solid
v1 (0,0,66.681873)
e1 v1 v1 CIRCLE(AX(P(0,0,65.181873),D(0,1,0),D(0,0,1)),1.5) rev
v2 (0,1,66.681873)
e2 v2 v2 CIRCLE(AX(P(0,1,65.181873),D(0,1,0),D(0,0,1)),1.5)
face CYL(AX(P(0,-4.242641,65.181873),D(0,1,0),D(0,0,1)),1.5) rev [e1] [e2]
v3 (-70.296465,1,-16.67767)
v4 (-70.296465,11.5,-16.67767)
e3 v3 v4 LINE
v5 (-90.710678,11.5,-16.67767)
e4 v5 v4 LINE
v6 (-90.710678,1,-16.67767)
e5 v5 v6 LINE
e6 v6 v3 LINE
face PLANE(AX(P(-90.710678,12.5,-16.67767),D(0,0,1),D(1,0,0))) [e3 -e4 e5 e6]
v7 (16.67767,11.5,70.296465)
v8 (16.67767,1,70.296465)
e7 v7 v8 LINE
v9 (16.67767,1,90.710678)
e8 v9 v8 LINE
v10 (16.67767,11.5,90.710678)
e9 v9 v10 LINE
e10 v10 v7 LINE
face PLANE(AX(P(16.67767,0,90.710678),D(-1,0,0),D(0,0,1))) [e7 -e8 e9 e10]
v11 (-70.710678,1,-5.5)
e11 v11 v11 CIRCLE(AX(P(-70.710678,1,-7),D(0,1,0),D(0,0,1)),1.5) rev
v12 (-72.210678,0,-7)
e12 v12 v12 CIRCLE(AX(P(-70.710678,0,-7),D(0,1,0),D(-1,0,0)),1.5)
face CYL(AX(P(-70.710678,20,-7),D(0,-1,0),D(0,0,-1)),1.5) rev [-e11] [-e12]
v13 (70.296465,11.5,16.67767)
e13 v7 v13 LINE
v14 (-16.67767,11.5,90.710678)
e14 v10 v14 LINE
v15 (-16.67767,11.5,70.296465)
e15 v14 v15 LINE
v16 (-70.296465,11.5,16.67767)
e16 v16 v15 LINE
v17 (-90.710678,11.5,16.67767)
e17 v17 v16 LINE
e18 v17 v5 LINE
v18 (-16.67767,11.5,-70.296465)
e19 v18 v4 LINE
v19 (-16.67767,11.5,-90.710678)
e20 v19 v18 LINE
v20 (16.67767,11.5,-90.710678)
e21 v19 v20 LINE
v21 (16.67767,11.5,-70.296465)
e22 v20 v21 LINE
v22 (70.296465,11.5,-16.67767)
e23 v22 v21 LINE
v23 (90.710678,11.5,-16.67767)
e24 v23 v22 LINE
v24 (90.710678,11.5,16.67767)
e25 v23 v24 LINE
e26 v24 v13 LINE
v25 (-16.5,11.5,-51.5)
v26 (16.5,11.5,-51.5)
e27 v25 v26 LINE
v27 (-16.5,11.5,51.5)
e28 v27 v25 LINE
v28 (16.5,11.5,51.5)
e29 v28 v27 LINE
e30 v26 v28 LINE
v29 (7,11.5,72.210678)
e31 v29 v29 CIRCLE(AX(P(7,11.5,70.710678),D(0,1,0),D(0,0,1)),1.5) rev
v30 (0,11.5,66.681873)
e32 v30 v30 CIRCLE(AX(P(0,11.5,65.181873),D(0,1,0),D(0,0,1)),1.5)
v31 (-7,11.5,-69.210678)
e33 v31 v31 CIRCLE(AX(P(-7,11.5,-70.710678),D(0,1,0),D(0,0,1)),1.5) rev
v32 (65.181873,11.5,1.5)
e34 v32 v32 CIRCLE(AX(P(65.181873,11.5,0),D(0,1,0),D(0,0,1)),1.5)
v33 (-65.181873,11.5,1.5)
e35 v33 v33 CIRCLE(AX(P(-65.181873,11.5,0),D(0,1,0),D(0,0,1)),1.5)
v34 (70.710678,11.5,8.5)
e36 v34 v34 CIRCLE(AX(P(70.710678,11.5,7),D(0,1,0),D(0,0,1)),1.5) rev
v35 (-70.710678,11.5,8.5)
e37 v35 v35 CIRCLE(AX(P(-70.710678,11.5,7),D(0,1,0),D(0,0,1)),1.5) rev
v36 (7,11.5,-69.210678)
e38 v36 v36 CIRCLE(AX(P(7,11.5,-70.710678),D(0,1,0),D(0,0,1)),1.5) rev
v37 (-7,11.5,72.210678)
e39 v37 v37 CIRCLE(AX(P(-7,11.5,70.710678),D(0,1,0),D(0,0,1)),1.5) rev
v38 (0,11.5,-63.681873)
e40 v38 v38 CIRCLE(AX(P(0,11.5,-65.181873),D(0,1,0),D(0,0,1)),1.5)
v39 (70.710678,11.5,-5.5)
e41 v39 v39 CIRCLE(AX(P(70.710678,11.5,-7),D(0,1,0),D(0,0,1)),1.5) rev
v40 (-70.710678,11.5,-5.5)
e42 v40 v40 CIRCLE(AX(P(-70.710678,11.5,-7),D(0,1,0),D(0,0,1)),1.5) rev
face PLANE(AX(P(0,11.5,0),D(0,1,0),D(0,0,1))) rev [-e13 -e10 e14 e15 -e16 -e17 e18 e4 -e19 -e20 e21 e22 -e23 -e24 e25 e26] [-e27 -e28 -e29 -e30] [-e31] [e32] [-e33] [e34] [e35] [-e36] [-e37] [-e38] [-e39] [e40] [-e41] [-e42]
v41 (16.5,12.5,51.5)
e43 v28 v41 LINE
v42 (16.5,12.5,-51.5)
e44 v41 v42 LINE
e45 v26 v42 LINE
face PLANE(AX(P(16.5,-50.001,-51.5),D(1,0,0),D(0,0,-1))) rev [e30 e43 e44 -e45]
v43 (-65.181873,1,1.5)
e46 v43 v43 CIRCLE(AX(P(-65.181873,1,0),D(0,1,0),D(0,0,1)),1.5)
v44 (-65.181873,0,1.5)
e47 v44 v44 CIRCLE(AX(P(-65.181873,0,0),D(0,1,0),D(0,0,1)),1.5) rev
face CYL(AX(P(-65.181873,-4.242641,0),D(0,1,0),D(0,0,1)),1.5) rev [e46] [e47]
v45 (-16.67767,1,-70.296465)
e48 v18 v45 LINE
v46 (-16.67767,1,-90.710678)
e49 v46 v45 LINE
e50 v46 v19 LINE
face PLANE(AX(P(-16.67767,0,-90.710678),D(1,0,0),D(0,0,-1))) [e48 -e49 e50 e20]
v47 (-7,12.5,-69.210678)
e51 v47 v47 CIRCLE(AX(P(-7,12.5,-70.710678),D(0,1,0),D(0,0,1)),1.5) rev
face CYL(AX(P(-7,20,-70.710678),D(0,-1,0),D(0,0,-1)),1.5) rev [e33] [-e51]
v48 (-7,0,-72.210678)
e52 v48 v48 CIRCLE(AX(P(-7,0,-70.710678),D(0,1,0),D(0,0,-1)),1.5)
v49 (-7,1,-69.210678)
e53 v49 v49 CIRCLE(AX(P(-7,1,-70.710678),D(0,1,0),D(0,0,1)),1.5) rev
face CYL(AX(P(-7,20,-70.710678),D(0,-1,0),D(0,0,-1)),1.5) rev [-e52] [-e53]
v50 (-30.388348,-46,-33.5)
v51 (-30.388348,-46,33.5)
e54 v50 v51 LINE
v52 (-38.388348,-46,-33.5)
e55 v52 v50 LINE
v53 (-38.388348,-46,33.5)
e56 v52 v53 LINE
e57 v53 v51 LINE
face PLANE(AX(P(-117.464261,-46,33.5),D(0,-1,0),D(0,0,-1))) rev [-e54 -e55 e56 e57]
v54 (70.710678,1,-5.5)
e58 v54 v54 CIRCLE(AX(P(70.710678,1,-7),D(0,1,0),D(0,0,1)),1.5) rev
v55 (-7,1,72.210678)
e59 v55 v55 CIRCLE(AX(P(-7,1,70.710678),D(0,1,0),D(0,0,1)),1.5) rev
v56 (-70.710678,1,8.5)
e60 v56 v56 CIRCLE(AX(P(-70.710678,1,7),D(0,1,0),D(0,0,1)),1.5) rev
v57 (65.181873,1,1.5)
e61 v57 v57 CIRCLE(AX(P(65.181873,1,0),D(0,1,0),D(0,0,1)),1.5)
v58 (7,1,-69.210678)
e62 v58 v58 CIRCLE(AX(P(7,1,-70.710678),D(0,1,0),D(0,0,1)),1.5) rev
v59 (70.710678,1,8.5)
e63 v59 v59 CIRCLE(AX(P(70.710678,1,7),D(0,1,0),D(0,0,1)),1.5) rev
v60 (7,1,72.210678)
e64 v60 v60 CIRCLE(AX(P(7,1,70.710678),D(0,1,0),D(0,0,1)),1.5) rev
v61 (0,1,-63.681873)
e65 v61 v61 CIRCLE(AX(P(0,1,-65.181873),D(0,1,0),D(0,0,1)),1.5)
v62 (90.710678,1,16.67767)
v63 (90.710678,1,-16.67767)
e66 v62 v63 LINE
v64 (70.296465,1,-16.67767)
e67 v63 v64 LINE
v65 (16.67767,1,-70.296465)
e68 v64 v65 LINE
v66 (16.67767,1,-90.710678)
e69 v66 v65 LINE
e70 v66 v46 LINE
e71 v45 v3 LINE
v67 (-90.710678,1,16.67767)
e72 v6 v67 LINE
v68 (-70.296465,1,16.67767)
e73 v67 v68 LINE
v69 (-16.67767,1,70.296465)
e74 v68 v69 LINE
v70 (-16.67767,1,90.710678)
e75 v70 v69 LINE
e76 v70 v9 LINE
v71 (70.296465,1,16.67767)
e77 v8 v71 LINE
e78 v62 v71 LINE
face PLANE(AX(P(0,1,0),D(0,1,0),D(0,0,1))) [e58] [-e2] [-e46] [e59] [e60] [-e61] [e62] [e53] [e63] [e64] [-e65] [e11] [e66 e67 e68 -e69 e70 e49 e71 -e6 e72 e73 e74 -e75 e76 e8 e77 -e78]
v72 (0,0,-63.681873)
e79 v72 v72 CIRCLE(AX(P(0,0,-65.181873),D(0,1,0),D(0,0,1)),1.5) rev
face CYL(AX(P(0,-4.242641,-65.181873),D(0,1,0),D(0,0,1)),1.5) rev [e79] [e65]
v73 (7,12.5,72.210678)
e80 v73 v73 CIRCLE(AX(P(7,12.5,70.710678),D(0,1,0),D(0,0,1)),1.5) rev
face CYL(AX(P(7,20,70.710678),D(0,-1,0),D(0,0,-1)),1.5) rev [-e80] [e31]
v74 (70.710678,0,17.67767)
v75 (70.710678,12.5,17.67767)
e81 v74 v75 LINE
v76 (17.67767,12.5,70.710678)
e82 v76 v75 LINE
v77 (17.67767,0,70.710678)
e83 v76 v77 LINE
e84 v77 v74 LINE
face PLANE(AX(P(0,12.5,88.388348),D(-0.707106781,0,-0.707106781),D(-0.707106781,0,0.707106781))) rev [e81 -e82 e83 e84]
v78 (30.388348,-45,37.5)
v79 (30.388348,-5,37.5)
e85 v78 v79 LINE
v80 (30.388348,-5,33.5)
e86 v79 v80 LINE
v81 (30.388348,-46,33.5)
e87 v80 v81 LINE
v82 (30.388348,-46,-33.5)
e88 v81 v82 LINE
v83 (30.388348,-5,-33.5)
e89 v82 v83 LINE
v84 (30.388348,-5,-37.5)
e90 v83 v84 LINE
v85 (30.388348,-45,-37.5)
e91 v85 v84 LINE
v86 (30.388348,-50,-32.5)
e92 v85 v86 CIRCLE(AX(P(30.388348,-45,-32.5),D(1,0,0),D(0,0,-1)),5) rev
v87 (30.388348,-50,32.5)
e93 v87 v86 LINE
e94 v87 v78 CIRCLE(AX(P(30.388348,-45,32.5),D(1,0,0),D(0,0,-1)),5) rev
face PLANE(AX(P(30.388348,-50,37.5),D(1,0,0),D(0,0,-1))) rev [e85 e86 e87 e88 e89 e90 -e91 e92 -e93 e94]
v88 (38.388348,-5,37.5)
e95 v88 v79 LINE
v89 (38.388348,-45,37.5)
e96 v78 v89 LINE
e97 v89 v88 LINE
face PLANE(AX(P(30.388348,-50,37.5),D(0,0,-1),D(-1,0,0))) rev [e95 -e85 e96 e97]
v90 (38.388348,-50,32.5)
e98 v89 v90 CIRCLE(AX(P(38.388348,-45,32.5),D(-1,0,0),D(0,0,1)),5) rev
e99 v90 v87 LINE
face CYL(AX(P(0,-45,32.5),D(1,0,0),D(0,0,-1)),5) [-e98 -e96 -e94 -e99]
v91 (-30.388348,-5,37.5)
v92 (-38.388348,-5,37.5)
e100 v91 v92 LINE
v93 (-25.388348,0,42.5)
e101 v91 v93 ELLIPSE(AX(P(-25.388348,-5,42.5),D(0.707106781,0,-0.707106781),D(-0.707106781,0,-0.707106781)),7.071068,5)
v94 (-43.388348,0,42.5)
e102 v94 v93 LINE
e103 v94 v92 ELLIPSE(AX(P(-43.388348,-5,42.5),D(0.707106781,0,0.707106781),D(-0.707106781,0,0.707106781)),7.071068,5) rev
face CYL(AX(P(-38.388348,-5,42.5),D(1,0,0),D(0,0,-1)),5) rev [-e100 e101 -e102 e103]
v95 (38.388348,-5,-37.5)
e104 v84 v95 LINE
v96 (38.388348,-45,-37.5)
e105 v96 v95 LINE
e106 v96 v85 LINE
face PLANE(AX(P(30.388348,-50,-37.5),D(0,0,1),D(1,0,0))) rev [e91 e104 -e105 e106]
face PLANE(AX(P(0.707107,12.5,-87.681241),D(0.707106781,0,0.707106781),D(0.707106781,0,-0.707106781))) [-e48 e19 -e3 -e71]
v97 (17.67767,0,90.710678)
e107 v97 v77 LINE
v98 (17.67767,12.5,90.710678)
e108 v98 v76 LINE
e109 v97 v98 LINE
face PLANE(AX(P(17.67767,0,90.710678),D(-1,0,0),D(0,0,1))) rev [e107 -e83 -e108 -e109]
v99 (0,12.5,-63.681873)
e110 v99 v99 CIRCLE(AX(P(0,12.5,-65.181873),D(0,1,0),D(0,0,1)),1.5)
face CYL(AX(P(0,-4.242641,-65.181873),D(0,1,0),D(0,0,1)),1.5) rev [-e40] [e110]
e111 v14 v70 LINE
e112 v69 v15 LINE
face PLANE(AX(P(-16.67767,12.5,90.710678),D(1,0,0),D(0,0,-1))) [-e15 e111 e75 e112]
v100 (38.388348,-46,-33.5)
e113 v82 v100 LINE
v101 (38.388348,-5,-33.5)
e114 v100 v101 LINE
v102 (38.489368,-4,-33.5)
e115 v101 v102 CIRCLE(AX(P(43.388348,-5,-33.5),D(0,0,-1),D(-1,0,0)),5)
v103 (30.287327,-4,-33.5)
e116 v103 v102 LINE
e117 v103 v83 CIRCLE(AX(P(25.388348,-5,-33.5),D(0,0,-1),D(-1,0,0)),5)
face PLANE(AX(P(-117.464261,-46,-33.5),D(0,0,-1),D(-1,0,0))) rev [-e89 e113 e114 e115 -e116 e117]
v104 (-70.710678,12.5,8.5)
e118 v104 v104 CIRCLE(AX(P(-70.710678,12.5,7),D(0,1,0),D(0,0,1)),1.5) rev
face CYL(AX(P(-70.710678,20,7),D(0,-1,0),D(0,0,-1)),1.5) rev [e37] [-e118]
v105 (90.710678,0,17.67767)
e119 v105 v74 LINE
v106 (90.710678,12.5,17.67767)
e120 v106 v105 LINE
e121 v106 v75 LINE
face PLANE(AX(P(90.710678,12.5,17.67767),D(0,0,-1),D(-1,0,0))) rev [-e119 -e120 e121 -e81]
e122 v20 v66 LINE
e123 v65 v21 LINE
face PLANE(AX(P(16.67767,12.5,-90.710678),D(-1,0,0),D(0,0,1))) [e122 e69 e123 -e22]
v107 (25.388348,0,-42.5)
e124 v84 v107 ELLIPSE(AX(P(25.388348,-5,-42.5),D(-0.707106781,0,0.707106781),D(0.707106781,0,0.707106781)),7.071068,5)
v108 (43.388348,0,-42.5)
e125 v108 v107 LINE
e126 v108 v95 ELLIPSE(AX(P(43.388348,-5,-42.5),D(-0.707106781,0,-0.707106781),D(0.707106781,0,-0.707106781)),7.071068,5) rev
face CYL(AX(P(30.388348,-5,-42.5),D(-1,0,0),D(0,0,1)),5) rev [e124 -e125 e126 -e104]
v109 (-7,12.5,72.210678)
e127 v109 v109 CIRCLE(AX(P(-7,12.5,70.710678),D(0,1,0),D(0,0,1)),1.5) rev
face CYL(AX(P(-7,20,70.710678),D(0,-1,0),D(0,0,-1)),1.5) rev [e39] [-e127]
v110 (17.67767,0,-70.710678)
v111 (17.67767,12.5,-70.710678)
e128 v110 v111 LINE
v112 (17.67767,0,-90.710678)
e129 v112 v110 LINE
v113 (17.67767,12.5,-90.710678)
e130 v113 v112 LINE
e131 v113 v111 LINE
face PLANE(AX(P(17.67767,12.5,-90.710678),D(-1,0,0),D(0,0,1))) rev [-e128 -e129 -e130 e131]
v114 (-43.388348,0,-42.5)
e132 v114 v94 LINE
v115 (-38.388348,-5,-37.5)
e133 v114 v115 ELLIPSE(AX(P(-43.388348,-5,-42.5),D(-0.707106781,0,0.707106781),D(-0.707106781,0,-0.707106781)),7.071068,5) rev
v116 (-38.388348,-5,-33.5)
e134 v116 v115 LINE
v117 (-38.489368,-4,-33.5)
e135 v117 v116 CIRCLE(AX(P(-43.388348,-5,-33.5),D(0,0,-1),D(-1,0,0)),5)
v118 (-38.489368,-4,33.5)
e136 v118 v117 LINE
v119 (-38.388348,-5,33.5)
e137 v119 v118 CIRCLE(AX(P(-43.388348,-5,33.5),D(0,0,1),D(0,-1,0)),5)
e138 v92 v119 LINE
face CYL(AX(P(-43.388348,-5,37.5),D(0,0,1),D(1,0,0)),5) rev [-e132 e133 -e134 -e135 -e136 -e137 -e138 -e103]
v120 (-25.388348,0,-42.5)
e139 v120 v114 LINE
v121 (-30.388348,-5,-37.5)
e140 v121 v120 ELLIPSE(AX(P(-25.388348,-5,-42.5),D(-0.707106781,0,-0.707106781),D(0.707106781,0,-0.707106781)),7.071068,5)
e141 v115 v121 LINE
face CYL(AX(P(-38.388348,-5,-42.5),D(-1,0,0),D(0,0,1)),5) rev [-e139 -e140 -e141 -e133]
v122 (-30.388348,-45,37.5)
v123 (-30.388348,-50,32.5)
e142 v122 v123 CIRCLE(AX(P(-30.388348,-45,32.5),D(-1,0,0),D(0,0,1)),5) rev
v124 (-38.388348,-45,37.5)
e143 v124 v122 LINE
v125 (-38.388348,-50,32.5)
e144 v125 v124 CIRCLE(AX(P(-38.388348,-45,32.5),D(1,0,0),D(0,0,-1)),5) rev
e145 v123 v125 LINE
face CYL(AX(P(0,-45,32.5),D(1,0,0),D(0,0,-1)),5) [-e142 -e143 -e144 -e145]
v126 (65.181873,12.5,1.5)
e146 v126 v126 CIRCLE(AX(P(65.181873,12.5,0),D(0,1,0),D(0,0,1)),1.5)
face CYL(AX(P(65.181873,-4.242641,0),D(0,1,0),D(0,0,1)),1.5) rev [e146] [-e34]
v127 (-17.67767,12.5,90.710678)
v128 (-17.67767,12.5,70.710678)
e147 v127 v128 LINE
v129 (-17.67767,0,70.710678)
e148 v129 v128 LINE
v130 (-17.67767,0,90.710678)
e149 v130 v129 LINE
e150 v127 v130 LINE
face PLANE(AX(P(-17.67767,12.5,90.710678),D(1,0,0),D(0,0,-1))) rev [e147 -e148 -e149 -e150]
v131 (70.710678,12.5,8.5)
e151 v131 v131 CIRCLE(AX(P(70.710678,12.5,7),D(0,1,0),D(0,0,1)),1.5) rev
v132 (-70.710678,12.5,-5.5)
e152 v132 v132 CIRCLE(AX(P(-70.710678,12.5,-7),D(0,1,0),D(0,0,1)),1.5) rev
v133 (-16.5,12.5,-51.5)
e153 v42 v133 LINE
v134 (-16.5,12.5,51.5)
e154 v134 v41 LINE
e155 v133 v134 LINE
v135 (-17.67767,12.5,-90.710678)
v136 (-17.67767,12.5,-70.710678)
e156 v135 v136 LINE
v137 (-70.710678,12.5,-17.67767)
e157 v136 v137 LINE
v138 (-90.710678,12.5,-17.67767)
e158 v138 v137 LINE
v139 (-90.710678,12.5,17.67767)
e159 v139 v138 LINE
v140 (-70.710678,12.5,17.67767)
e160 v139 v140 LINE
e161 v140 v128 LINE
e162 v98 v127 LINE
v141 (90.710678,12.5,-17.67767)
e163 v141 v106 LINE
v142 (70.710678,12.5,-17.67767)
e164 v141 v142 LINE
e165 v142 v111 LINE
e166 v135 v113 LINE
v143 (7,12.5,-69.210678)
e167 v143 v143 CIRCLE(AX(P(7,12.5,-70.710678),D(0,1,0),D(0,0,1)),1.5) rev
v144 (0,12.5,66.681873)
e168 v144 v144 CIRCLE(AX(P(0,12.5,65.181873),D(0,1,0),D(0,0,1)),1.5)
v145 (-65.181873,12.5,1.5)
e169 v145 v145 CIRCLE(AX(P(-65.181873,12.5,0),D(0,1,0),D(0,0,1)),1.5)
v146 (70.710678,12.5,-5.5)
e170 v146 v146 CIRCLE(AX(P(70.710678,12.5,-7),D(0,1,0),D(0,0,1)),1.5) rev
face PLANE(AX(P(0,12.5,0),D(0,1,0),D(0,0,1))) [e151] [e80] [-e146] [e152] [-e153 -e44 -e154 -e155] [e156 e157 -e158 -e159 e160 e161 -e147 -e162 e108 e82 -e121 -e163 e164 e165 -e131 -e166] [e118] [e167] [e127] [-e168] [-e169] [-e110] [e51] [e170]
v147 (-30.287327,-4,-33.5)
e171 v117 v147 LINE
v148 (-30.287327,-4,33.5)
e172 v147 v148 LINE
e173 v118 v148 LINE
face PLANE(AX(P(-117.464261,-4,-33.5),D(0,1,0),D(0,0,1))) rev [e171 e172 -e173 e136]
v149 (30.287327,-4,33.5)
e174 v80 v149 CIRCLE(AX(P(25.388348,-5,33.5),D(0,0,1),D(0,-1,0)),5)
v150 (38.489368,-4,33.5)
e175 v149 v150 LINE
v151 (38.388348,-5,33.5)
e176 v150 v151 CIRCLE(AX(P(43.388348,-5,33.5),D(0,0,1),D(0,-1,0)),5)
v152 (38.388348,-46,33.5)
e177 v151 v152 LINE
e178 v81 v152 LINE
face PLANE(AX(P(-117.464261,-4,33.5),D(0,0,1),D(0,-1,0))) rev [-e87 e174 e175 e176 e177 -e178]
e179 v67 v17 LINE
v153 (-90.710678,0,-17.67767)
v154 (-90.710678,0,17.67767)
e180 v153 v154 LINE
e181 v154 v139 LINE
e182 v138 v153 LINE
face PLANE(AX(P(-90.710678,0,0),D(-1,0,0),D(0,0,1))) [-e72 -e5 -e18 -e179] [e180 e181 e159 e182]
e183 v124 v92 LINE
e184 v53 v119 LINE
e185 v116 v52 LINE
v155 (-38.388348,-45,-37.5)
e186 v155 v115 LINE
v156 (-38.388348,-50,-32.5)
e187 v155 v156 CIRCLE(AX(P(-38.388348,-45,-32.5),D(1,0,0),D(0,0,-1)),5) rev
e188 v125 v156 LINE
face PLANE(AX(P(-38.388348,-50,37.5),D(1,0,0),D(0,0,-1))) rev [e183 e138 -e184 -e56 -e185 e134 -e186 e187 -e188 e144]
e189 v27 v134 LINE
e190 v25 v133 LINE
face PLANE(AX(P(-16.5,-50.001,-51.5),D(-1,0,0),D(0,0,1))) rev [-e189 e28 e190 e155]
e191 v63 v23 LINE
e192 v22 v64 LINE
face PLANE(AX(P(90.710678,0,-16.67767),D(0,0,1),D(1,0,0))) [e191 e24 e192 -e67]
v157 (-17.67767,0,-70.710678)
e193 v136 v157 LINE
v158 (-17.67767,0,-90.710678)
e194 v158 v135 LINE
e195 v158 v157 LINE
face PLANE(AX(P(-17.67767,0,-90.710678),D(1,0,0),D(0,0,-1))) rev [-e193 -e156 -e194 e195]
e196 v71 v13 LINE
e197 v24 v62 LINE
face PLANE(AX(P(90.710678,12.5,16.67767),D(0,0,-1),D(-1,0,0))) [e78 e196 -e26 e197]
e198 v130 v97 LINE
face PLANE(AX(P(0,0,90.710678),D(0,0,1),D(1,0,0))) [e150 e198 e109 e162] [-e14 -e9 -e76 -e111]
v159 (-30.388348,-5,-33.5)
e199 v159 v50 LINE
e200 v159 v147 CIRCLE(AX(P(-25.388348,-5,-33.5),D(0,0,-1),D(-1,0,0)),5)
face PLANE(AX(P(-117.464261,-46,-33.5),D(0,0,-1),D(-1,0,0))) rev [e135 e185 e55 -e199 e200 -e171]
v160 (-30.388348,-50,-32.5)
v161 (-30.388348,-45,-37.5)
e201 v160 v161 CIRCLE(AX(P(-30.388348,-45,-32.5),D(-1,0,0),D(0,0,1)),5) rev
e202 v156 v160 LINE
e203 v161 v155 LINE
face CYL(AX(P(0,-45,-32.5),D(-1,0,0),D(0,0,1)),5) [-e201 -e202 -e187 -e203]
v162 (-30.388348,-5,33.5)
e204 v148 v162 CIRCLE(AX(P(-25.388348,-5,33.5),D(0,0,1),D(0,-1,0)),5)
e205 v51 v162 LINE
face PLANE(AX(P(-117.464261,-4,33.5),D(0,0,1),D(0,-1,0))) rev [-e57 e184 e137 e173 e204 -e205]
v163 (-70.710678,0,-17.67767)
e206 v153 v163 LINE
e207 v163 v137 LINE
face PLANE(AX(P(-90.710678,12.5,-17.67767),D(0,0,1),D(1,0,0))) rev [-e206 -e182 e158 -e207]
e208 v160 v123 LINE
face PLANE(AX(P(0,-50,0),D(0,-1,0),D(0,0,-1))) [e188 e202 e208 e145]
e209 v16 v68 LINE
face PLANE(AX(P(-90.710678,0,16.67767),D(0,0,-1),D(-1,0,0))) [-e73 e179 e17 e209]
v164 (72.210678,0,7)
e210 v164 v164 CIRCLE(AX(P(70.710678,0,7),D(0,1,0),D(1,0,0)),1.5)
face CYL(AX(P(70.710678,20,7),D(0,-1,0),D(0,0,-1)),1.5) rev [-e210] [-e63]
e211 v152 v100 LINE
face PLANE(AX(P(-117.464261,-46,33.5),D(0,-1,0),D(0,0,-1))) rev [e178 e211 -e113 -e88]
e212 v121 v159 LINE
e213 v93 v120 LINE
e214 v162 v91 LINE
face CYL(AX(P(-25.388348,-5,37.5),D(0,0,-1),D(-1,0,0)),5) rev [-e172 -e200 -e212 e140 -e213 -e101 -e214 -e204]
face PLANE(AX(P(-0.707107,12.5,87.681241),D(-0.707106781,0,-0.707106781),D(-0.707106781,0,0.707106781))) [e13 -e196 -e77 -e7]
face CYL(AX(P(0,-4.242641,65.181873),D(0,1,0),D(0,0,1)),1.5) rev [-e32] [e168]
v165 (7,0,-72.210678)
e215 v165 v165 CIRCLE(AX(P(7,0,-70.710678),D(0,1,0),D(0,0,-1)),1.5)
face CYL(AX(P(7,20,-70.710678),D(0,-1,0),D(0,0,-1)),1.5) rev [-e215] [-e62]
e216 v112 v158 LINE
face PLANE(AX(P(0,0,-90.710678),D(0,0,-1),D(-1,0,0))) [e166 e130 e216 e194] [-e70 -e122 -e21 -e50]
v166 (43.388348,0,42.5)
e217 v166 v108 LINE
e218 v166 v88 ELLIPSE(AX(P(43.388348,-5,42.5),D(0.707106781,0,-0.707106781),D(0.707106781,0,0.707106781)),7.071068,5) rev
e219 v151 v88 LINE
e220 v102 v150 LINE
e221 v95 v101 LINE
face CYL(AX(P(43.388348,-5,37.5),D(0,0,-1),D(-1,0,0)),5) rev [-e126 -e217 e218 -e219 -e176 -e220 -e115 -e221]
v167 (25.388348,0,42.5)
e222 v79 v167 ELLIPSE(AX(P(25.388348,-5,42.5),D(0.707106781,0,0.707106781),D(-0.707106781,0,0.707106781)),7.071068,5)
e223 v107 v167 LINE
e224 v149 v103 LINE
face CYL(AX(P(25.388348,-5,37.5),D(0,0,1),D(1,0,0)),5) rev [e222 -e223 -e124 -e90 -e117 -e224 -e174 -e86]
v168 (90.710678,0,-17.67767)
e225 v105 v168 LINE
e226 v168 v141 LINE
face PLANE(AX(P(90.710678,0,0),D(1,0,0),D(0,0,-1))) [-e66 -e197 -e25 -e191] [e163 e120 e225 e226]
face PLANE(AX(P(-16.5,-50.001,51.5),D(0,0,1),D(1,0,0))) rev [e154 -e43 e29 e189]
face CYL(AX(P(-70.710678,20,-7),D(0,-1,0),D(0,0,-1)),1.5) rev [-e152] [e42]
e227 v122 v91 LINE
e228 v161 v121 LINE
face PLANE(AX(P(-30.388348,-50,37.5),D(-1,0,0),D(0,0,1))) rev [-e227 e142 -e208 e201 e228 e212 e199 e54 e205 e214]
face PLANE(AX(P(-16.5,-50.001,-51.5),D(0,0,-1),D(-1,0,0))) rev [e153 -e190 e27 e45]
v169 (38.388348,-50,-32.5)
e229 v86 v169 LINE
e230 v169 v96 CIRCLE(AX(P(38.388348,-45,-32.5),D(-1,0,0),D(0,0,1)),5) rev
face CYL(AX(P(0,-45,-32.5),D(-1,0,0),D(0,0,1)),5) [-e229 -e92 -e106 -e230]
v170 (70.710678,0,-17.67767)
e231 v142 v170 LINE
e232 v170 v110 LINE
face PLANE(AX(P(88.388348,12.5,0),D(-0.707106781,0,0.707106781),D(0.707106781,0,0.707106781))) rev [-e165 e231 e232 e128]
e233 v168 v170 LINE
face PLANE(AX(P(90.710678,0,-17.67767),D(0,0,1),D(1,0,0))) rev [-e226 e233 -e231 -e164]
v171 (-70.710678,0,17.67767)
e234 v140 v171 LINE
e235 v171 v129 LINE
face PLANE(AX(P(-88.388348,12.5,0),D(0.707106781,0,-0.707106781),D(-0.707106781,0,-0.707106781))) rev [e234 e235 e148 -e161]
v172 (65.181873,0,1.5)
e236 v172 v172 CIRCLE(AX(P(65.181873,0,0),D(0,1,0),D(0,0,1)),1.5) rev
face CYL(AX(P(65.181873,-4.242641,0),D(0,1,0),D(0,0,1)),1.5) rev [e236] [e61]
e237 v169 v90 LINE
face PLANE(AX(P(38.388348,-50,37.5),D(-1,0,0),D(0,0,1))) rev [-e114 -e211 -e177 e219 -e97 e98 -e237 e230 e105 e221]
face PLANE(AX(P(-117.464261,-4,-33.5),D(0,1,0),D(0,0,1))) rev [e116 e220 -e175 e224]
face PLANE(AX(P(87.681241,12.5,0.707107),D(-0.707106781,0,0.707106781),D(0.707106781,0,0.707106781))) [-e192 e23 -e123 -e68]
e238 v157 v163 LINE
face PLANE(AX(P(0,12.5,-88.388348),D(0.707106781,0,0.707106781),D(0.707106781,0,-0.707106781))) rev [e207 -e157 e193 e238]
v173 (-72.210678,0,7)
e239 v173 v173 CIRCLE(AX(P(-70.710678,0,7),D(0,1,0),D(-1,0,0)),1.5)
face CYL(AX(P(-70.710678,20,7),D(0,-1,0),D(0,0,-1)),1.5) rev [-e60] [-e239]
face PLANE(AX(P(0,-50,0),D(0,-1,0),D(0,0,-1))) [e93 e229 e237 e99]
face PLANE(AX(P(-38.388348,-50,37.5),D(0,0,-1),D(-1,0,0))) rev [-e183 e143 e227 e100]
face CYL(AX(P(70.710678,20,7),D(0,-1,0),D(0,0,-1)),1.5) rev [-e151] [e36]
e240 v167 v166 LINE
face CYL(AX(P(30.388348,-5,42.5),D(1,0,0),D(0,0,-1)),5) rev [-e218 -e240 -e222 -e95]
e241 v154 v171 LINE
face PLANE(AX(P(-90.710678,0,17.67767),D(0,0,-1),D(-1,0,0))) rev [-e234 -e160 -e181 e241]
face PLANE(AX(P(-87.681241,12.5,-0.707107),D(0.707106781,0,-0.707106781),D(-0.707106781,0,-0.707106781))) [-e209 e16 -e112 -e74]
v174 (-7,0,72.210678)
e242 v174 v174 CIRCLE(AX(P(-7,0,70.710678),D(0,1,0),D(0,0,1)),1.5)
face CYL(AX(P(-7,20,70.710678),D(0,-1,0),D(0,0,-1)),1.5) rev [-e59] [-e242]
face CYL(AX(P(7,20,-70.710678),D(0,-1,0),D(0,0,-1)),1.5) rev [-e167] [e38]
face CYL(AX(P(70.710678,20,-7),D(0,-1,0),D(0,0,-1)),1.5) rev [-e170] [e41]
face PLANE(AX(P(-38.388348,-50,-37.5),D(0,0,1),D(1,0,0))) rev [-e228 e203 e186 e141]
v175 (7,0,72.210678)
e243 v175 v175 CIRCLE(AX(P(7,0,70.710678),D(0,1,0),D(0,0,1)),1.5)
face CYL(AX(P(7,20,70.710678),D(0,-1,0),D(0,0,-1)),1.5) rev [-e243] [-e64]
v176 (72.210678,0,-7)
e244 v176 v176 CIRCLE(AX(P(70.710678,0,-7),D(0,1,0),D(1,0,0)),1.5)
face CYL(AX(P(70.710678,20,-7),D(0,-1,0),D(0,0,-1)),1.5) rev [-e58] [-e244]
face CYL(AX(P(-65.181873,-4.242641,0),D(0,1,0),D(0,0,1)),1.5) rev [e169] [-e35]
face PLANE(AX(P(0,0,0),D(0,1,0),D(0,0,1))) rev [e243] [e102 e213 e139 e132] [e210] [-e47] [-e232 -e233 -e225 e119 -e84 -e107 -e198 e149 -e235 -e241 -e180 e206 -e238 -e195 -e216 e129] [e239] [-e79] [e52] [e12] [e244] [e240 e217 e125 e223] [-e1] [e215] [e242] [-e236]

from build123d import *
from build123d.topology import SkipClean

# Parameters (mm, degrees)
BOSS_EXTRUDE1_DEPTH = 12.5
CHAMFER1_SIZE       = 25
SKETCH3_W           = 35.35533906
SKETCH3_H           = 12.5
BOSS_EXTRUDE2_DEPTH = 20
SKETCH4_W           = 35.35533906
SKETCH4_H           = 12.5
BOSS_EXTRUDE3_DEPTH = 20
SKETCH5_W           = 35.35533906
SKETCH5_H           = 12.5
BOSS_EXTRUDE4_DEPTH = 20
SKETCH6_W           = 35.35533906
SKETCH6_H           = 12.5
BOSS_EXTRUDE5_DEPTH = 20
SHELL1_T            = -1
SKETCH7_R           = 1.5
CUT_EXTRUDE1_DEPTH  = 20
CIRPATTERN1_COUNT   = 4
SKETCH8_W           = 8
SKETCH8_H           = 75
BOSS_EXTRUDE6_DEPTH = 50
CUT_EXTRUDE2_REACH  = 167.514
SKETCH9_W           = 67
SKETCH9_H           = 42
FILLET2_START       = -38.388347648
FILLET2_DEPTH       = 8
FILLET2_START_2     = 30.388347648
FILLET2_2_DEPTH     = 8
FILLET2_START_3     = -42.5
FILLET2_3_DEPTH     = 85
FILLET2_START_4     = -44
FILLET2_4_OUTLINE_W = 1
FILLET2_4_OUTLINE_H = 67
FILLET2_4_DEPTH     = 88
FILLET3_R           = 5
CUT_EXTRUDE3_REACH  = 144.699
SKETCH10_W          = 33
SKETCH10_H          = 103
CUT_EXTRUDE4_START  = -12.5
SKETCH11_R          = 1.5
CUT_EXTRUDE4_DEPTH  = 12.5


with BuildPart() as part:
    # Sketch1 → Boss-Extrude1 (new body)
    with BuildSketch(Plane(origin=(0, 0, 0), x_dir=(1, 0, 0), z_dir=(0, 1, 0))):
        Polygon((88.388347648, 0), (0, 88.388347648), (-88.388347648, 0), (0, -88.388347648), align=None)
    extrude(amount=BOSS_EXTRUDE1_DEPTH)

    # Chamfer1
    chamfer1_edges = [part.edges().sort_by_distance(p)[0] for p in [
        (0, 6.25, 88.388347648),
        (-88.388347648, 6.25, 0),
        (0, 6.25, -88.388347648),
        (88.388347648, 6.25, 0),
    ]]
    chamfer(chamfer1_edges, length=CHAMFER1_SIZE)

    # Sketch3 → Boss-Extrude2 (add)
    with BuildSketch(Plane.XY.offset(70.710678119)):
        with Locations((0, 6.25)):
            Rectangle(SKETCH3_W, SKETCH3_H)
    extrude(amount=BOSS_EXTRUDE2_DEPTH)

    # Sketch4 → Boss-Extrude3 (add)
    with BuildSketch(Plane(origin=(70.710678119, 0, 0), x_dir=(0, 0, -1), z_dir=(1, 0, 0))):
        with Locations((0, 6.25)):
            Rectangle(SKETCH4_W, SKETCH4_H)
    extrude(amount=BOSS_EXTRUDE3_DEPTH)

    # Sketch5 → Boss-Extrude4 (add)
    with BuildSketch(Plane(origin=(0, 0, -70.710678119), x_dir=(-1, 0, 0), z_dir=(0, 0, -1))):
        with Locations((0, 6.25)):
            Rectangle(SKETCH5_W, SKETCH5_H)
    extrude(amount=BOSS_EXTRUDE4_DEPTH)

    # Sketch6 → Boss-Extrude5 (add)
    with BuildSketch(Plane.ZY.offset(70.710678119)):
        with Locations((0, 6.25)):
            Rectangle(SKETCH6_W, SKETCH6_H)
    extrude(amount=BOSS_EXTRUDE5_DEPTH)

    # Shell1
    shell1_openings = [part.faces().sort_by_distance(p)[0] for p in [
        (0, 6.25, 90.710678119),
        (90.710678119, 6.25, 0),
        (0, 6.25, -90.710678119),
        (-90.710678119, 6.25, 0),
    ]]
    offset(amount=SHELL1_T, openings=shell1_openings, kind=Kind.INTERSECTION)

    # Sketch7 → Cut-Extrude1 (cut)
    with BuildSketch(Plane(origin=(-70.710678119, 0, -17.67766953), x_dir=(1, 0, 0), z_dir=(0, 1, 0))):
        with Locations(Location((63.710678119, -88.388347648, 0), (0, 0, 270))):
            Circle(SKETCH7_R)
        with Locations(Location((77.710678119, -88.388347648, 0), (0, 0, 270))):
            Circle(SKETCH7_R)
    cut_extrude1 = extrude(amount=CUT_EXTRUDE1_DEPTH, mode=Mode.SUBTRACT)

    # CirPattern1: Cut-Extrude1 ×4 about axis
    cirpattern1_axis = Axis((0, 0, 0), (0, 1, 0))
    for i in range(1, CIRPATTERN1_COUNT):
        add(cut_extrude1.rotate(cirpattern1_axis, i * 360 / CIRPATTERN1_COUNT), mode=Mode.SUBTRACT)

    # Sketch8 → Boss-Extrude6 (add)
    with BuildSketch(Plane.XZ):
        with Locations((-34.388347648, 0)):
            Rectangle(SKETCH8_W, SKETCH8_H)
        with Locations((34.388347648, 0)):
            Rectangle(SKETCH8_W, SKETCH8_H)
    extrude(amount=BOSS_EXTRUDE6_DEPTH)

    # Cut-Extrude2: up to this face of the body (flat: up to its plane)
    cut_extrude2_end = Plane(part.part.faces().sort_by_distance((-38.388347648, -25, 0))[0])
    # Sketch9 → Cut-Extrude2 (cut, up to the picked face)
    with BuildSketch(Plane(origin=(38.388347648, 0, 0), x_dir=(0, 0, -1), z_dir=(1, 0, 0)), mode=Mode.PRIVATE) as cut_extrude2_sk1:
        with Locations((0, -25)):
            Rectangle(SKETCH9_W, SKETCH9_H)
    cut_extrude2_tool1 = split(extrude(cut_extrude2_sk1.sketch, amount=-CUT_EXTRUDE2_REACH, mode=Mode.PRIVATE), bisect_by=cut_extrude2_end, keep=Keep.BOTH, mode=Mode.PRIVATE)
    add(cut_extrude2_tool1.solids().sort_by(Axis((38.388348, -25, 0), (-1, 0, 0)))[0], mode=Mode.SUBTRACT)

    # Fillet2: read off the stored shape, not the designer's step
    # Fillet2 outline → Fillet2 (add)
    with BuildSketch(Plane.YZ.offset(FILLET2_START)):
        with BuildLine():
            Line((0, -42.5), (0, -37.5))
            Line((0, -37.5), (-5, -37.5))
            ThreePointArc((-5, -37.5), (-1.464466094, -38.964466094), (0, -42.5))
        make_face()
        with BuildLine():
            ThreePointArc((0, 42.5), (-1.464466094, 38.964466094), (-5, 37.5))
            Line((-5, 37.5), (0, 37.5))
            Line((0, 37.5), (0, 42.5))
        make_face()
    extrude(amount=FILLET2_DEPTH)

    # Fillet2 2 outline → Fillet2 2 (add)
    with BuildSketch(Plane.YZ.offset(FILLET2_START_2)):
        with BuildLine():
            Line((0, -42.5), (0, -37.5))
            Line((0, -37.5), (-5, -37.5))
            ThreePointArc((-5, -37.5), (-1.464466094, -38.964466094), (0, -42.5))
        make_face()
        with BuildLine():
            ThreePointArc((0, 42.5), (-1.464466094, 38.964466094), (-5, 37.5))
            Line((-5, 37.5), (0, 37.5))
            Line((0, 37.5), (0, 42.5))
        make_face()
    extrude(amount=FILLET2_2_DEPTH)

    # Fillet2 3 outline → Fillet2 3 (add)
    with BuildSketch(Plane.XY.offset(FILLET2_START_3)):
        with BuildLine():
            Line((-38.388347648, -5), (-38.388347648, 0))
            Line((-38.388347648, 0), (-43.388347648, 0))
            ThreePointArc((-43.388347648, 0), (-39.852813742, -1.464466094), (-38.388347648, -5))
        make_face()
        with BuildLine():
            ThreePointArc((-30.388347648, -5), (-28.923881554, -1.464466094), (-25.388347648, 0))
            Line((-25.388347648, 0), (-30.388347648, 0))
            Line((-30.388347648, 0), (-30.388347648, -5))
        make_face()
        with BuildLine():
            Line((43.388347648, 0), (38.388347648, 0))
            Line((38.388347648, 0), (38.388347648, -5))
            ThreePointArc((38.388347648, -5), (39.852813742, -1.464466094), (43.388347648, 0))
        make_face()
        with BuildLine():
            ThreePointArc((25.388347648, 0), (28.923881554, -1.464466094), (30.388347648, -5))
            Line((30.388347648, -5), (30.388347648, 0))
            Line((30.388347648, 0), (25.388347648, 0))
        make_face()
    extrude(amount=FILLET2_3_DEPTH)

    # Fillet2 4 outline → Fillet2 4 (cut)
    with SkipClean():  # the faces are left unmerged after this step: merging them gives an invalid solid
        with BuildSketch(Plane.YZ.offset(FILLET2_START_4)):
            with BuildLine():
                Line((-5, 42.5), (-5, 37.5))
                ThreePointArc((-5, 37.5), (-1.464466094, 38.964466094), (0, 42.5))
                Line((0, 42.5), (-5, 42.5))
            make_face()
            with BuildLine():
                Line((-5, -37.5), (-5, -42.5))
                Line((-5, -42.5), (0, -42.5))
                ThreePointArc((0, -42.5), (-1.464466094, -38.964466094), (-5, -37.5))
            make_face()
            with Locations((-4.5, 0)):
                Rectangle(FILLET2_4_OUTLINE_W, FILLET2_4_OUTLINE_H)
        extrude(amount=FILLET2_4_DEPTH, mode=Mode.SUBTRACT)
    add(part.part.scale(1), mode=Mode.REPLACE)  # the faces are merged on a copy

    # Fillet3
    fillet3_edges = [part.edges().sort_by_distance(p)[0] for p in [
        (-34.388347648, -50, -37.5),
        (-34.388347648, -50, 37.5),
        (34.388347648, -50, -37.5),
        (34.388347648, -50, 37.5),
    ]]
    fillet(fillet3_edges, radius=FILLET3_R)

    # Sketch10 → Cut-Extrude3 (cut, up to next)
    with BuildSketch(Plane(origin=(0, 12.5, 0), x_dir=(1, 0, 0), z_dir=(0, 1, 0)), mode=Mode.PRIVATE) as cut_extrude3_sk1:
        Rectangle(SKETCH10_W, SKETCH10_H)
    cut_extrude3_tool1 = extrude(cut_extrude3_sk1.sketch, amount=-CUT_EXTRUDE3_REACH, mode=Mode.PRIVATE) & part.part
    add(cut_extrude3_tool1.solids().sort_by_distance((0, 12.5, 0))[0], mode=Mode.SUBTRACT)

    # Sketch11 → Cut-Extrude4 (cut)
    with BuildSketch(Plane(origin=(0, 12.5, 0), x_dir=(1, 0, 0), z_dir=(0, 1, 0)).offset(CUT_EXTRUDE4_START)):
        with Locations(Location((0, -65.181873268, 0), (0, 0, 270))):
            Circle(SKETCH11_R)
        with Locations(Location((-65.181873268, 0, 0), (0, 0, 270))):
            Circle(SKETCH11_R)
        with Locations(Location((0, 65.181873268, 0), (0, 0, 270))):
            Circle(SKETCH11_R)
        with Locations(Location((65.181873268, 0, 0), (0, 0, 270))):
            Circle(SKETCH11_R)
    extrude(amount=CUT_EXTRUDE4_DEPTH, mode=Mode.SUBTRACT)


solid = part.part
